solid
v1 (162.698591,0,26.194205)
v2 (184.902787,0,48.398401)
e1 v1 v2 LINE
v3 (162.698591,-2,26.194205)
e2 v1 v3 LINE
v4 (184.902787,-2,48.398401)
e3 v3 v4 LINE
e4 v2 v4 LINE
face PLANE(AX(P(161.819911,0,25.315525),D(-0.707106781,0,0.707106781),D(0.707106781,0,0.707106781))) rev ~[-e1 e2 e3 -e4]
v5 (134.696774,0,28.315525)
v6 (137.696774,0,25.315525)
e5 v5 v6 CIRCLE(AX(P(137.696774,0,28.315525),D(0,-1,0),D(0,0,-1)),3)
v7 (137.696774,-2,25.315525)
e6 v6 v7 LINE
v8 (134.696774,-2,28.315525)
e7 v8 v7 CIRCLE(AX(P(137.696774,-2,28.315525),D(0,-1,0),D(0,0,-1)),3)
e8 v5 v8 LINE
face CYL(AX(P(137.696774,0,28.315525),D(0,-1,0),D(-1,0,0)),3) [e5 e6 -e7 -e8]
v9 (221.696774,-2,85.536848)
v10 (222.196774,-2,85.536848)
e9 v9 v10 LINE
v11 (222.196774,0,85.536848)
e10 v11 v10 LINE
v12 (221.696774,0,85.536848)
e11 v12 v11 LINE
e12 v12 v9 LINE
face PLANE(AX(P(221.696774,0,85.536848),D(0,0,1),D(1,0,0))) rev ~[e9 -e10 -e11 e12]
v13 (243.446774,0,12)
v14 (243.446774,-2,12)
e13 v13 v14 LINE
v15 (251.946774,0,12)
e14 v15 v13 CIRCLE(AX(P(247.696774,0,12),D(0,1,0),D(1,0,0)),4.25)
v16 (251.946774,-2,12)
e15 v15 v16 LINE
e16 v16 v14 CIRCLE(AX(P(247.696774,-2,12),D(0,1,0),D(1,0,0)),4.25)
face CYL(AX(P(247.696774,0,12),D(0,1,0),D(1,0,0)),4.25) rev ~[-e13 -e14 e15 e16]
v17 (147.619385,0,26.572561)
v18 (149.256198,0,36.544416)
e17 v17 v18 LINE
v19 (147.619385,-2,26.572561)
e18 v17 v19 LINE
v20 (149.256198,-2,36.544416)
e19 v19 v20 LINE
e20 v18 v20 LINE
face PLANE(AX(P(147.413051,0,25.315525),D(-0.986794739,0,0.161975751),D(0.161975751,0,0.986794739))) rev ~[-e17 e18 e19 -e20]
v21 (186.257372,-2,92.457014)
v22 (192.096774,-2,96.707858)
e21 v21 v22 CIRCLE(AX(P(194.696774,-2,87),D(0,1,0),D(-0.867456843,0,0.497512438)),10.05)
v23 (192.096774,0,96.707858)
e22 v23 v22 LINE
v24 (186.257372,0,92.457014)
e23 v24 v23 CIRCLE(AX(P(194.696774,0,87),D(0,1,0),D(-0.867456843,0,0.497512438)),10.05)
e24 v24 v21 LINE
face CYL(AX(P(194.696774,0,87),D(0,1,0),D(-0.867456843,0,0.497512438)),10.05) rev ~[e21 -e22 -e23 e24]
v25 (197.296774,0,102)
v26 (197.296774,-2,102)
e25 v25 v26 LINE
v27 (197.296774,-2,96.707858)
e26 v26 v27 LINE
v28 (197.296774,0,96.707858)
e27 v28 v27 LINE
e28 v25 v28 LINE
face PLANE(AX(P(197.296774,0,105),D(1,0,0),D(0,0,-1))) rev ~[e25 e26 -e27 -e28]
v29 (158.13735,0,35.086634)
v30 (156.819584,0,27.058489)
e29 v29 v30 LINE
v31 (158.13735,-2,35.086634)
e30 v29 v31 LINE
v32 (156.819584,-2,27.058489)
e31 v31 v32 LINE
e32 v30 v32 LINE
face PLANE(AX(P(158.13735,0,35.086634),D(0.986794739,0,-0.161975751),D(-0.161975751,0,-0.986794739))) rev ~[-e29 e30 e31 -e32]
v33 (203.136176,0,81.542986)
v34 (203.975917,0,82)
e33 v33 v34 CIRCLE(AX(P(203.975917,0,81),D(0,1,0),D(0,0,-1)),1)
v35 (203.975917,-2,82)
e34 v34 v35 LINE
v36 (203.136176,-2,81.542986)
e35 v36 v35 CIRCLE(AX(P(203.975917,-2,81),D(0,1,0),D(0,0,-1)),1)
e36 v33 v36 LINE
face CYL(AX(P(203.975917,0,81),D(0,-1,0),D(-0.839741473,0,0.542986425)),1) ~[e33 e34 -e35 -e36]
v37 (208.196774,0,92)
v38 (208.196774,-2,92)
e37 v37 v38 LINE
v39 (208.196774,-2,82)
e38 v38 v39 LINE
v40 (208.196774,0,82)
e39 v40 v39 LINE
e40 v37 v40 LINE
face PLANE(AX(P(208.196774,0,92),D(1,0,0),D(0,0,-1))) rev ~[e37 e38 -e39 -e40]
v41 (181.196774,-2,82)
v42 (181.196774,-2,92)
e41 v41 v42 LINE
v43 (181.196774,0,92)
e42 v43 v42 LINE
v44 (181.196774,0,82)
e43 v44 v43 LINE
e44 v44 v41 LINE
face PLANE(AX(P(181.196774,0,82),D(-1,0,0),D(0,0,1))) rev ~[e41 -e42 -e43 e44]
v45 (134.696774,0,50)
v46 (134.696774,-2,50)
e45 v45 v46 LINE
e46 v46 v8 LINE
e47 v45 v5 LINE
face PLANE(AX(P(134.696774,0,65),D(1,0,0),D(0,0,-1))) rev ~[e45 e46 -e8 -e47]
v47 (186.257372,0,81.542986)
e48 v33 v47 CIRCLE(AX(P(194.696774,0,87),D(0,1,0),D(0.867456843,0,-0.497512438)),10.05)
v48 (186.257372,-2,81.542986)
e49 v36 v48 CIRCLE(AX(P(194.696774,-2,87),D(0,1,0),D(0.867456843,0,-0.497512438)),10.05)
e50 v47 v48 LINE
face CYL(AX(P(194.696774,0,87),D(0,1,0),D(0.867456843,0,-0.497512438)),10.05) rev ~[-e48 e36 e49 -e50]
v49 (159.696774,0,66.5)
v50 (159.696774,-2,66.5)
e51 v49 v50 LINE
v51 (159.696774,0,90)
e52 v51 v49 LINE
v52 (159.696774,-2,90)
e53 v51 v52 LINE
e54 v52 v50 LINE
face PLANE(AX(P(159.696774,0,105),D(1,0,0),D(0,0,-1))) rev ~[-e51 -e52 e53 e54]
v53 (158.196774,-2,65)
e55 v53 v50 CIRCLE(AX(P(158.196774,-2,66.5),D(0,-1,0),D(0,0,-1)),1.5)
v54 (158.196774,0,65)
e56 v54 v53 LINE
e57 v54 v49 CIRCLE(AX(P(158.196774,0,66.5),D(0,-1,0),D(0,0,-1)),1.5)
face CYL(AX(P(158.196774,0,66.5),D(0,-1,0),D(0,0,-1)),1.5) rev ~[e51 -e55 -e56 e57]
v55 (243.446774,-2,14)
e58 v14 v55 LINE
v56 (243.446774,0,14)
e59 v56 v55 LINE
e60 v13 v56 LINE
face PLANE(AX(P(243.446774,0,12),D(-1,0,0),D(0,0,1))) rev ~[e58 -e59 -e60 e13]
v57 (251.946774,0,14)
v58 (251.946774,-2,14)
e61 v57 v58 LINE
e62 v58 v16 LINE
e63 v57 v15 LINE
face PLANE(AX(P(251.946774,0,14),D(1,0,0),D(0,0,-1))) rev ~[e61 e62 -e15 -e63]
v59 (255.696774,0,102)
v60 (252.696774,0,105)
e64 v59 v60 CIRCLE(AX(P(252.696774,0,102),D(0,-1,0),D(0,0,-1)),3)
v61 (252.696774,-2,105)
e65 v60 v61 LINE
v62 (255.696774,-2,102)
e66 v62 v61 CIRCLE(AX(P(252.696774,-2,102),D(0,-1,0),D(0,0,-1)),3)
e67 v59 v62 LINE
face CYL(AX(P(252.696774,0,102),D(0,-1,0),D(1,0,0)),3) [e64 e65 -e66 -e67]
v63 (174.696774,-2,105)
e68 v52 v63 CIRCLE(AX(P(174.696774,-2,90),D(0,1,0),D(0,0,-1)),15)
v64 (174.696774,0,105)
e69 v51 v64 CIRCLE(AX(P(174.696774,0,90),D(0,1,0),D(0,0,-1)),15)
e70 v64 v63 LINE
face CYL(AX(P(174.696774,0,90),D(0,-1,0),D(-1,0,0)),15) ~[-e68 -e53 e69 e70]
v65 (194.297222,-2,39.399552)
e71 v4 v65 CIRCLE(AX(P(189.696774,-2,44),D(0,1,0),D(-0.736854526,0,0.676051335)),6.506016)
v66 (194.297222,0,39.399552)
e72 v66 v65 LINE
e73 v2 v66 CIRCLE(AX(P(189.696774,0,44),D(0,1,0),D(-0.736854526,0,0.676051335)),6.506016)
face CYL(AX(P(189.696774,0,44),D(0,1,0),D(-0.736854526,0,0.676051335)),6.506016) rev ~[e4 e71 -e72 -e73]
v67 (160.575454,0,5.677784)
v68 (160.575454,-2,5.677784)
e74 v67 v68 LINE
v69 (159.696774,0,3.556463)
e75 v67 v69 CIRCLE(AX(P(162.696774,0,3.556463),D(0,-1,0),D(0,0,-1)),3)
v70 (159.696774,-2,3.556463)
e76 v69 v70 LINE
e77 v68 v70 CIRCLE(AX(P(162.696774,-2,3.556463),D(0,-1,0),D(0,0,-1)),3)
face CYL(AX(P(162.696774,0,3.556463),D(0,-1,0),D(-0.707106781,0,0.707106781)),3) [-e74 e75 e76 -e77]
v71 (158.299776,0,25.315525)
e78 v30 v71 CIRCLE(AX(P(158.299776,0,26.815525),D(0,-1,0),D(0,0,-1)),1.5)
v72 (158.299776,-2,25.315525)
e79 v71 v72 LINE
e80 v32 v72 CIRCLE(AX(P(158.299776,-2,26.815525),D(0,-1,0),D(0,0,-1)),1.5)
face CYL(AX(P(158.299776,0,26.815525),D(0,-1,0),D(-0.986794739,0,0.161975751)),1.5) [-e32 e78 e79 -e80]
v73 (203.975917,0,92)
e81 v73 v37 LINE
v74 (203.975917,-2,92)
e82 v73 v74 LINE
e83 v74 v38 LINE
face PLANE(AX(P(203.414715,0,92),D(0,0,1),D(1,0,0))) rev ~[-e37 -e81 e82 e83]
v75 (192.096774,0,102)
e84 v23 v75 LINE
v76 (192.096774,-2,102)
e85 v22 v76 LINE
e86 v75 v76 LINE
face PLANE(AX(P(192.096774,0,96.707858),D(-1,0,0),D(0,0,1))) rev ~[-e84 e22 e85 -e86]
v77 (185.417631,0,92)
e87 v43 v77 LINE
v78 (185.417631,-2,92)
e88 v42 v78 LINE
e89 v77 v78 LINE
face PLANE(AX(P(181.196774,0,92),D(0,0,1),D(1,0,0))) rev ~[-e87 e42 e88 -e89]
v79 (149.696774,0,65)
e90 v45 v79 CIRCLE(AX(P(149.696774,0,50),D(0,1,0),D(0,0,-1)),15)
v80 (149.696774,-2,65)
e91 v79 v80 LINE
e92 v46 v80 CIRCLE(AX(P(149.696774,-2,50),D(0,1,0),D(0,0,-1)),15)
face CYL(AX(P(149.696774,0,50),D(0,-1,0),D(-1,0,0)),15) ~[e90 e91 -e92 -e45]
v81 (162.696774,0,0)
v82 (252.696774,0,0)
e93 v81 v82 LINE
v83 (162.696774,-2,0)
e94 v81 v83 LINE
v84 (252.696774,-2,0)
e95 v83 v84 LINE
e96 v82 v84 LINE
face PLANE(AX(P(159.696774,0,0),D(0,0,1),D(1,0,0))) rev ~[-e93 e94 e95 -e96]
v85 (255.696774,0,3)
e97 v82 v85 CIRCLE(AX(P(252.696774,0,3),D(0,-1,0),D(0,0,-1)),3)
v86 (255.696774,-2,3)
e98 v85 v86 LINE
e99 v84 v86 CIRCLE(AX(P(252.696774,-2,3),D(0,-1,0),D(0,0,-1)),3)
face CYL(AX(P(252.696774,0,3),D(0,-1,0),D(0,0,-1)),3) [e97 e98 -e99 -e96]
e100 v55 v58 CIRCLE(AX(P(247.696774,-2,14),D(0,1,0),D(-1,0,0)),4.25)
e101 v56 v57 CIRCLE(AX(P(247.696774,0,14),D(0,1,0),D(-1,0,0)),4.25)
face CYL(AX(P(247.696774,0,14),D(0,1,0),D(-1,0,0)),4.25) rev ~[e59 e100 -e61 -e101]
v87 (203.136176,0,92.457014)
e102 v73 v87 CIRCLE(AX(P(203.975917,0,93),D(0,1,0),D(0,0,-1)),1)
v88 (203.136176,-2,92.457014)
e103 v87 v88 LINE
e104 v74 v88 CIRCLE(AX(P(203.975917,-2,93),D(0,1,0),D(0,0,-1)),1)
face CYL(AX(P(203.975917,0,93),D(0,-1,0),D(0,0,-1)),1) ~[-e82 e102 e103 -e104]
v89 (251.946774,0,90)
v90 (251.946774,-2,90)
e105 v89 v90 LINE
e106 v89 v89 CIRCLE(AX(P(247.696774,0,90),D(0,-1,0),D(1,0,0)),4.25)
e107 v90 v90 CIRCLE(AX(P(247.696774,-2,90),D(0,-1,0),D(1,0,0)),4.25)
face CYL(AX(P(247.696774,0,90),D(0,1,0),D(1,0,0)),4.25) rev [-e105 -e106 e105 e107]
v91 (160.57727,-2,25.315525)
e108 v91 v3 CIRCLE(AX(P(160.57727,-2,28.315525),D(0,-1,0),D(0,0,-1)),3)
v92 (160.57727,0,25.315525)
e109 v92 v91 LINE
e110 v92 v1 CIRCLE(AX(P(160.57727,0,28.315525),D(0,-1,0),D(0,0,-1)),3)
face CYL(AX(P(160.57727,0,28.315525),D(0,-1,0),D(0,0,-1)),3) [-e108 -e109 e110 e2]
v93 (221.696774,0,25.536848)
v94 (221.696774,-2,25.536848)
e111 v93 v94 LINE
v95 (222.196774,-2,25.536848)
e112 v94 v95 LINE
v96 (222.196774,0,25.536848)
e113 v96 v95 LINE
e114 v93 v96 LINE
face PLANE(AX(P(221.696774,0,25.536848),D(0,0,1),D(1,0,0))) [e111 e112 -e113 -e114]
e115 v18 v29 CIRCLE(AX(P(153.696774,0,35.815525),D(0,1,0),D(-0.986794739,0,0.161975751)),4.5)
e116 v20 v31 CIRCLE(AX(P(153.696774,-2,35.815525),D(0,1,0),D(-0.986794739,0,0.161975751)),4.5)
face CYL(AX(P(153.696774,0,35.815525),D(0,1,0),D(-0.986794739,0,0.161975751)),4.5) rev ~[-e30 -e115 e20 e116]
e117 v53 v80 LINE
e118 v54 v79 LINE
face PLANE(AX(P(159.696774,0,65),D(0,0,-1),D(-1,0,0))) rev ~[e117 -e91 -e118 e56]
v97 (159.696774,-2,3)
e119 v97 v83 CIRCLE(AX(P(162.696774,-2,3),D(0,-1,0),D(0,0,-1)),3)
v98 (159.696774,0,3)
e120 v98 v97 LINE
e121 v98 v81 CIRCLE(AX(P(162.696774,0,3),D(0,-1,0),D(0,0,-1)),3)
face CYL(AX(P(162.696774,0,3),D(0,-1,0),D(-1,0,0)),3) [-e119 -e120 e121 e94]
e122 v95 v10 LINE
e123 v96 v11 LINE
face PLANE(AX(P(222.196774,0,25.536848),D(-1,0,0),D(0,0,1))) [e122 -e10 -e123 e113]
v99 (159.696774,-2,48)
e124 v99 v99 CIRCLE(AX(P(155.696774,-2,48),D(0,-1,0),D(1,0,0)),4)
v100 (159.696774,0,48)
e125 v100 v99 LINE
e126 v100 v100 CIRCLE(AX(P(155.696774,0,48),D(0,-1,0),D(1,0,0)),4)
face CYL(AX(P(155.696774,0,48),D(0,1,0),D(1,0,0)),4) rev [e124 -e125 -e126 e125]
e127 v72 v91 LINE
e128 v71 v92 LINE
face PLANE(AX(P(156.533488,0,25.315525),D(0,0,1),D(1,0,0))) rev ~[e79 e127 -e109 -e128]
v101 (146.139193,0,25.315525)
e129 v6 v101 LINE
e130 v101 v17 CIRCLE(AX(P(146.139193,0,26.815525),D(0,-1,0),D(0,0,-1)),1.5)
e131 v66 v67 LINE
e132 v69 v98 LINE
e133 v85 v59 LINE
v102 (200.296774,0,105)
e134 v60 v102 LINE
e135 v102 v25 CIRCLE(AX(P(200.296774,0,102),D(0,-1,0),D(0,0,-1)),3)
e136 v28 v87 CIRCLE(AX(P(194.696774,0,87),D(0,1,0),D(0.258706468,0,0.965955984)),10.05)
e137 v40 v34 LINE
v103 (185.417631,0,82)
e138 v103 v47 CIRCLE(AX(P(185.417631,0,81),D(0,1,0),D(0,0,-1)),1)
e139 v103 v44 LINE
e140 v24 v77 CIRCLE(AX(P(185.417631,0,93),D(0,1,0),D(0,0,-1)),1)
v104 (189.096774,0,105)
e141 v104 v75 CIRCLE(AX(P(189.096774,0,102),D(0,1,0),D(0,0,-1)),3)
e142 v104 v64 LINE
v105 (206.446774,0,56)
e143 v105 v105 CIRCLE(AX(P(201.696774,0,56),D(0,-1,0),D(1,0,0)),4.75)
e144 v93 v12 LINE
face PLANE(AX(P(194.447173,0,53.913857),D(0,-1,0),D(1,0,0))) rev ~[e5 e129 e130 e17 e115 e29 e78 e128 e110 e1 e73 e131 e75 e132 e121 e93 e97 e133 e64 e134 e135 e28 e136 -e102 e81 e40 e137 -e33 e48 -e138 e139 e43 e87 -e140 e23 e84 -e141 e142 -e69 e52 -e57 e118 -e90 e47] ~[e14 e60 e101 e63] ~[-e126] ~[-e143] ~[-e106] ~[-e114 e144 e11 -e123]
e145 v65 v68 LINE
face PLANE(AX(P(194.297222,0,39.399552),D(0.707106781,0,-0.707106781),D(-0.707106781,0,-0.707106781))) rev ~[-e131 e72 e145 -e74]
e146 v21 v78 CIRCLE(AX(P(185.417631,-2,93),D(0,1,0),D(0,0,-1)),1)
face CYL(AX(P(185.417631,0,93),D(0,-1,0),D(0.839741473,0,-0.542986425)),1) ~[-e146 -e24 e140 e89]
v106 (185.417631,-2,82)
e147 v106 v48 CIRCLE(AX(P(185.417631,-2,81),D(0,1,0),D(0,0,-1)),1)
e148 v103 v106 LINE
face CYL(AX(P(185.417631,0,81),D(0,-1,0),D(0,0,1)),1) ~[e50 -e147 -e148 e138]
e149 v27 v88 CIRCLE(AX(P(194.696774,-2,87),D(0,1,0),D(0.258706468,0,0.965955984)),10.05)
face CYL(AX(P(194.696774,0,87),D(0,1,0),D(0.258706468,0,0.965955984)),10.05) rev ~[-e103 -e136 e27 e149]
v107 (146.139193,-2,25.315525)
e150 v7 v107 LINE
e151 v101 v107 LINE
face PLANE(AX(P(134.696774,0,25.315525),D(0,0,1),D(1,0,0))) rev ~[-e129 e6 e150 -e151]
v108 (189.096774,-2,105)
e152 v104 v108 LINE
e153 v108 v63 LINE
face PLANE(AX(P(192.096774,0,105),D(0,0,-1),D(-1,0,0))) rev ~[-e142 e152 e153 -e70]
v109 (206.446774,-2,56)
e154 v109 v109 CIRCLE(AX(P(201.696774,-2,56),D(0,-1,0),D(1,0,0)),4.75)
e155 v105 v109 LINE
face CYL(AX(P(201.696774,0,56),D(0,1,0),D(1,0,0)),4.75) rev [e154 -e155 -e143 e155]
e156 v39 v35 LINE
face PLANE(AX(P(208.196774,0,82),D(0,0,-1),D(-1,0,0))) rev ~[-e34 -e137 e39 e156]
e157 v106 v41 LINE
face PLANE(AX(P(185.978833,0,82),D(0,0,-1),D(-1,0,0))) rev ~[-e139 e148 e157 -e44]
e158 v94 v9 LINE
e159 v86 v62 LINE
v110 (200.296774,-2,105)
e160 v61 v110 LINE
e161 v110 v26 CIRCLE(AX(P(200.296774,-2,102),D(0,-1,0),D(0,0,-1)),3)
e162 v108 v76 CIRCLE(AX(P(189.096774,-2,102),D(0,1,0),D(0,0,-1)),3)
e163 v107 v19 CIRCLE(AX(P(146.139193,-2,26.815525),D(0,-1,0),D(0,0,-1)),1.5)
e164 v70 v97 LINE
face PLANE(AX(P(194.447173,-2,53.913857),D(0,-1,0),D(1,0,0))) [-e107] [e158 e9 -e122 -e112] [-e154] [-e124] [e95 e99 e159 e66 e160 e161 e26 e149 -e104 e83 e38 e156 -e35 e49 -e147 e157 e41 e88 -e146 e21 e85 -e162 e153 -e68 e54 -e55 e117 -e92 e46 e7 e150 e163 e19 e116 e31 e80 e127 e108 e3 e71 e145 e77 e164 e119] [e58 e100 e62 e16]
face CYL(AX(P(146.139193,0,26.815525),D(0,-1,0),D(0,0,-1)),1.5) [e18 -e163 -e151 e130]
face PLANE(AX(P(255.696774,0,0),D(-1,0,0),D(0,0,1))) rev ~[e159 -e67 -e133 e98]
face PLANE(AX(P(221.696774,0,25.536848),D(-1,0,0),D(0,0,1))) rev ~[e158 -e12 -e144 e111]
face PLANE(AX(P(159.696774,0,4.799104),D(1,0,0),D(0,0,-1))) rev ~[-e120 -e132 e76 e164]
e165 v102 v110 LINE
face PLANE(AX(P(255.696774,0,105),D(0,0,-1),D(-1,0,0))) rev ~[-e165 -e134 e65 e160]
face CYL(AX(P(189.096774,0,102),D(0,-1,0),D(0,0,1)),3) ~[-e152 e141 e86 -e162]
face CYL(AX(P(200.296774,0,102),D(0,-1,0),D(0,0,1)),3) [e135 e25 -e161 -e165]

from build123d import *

# Parameters (mm, degrees)
F0_R     = 4
F0_R_2   = 4.75
F0_W     = 0.5
F0_H     = 60
F0_R_3   = 4.25
F1_DEPTH = 2
F2_R     = 15
F3_R     = 3
F4_R     = 1.5
F5_R     = 1


# Not quite as in the source:
# - a feature names something its author has since deleted; it is built from what else it names


with BuildPart() as f1:
    # F0 (on Front) → F1 (new body)
    with BuildSketch(Plane.XZ):
        with BuildLine():
            Line((159.6967741251, 4.7991039181), (159.6967741251, 0))
            Line((159.6967741251, 0), (255.6967741251, 0))
            Line((255.6967741251, 0), (255.6967741251, 105))
            Line((255.6967741251, 105), (197.2967741251, 105))
            Line((197.2967741251, 105), (197.2967741251, 96.7078576421))
            ThreePointArc((197.2967741251, 96.7078576421), (200.8257976645, 94.9647705839), (203.4147153958, 92))
            Line((203.4147153958, 92), (208.1967741251, 92))
            Line((208.1967741251, 92), (208.1967741251, 82))
            Line((208.1967741251, 82), (203.4147153958, 82))
            ThreePointArc((203.4147153958, 82), (194.6967741251, 76.95), (185.9788328544, 82))
            Line((185.9788328544, 82), (181.1967741251, 82))
            Line((181.1967741251, 82), (181.1967741251, 92))
            Line((181.1967741251, 92), (185.9788328544, 92))
            ThreePointArc((185.9788328544, 92), (188.5677505857, 94.9647705839), (192.0967741251, 96.7078576421))
            Line((192.0967741251, 96.7078576421), (192.0967741251, 105))
            Line((192.0967741251, 105), (159.6967741251, 105))
            Line((159.6967741251, 105), (159.6967741251, 65))
            Line((159.6967741251, 65), (134.6967741251, 65))
            Line((134.6967741251, 65), (134.6967741251, 25.3155251003))
            Line((134.6967741251, 25.3155251003), (147.4130505224, 25.3155251003))
            Line((147.4130505224, 25.3155251003), (149.2561978018, 36.5444159815))
            ThreePointArc((149.2561978018, 36.5444159815), (154.4256650063, 40.2561014236), (158.1373504484, 35.0866342191))
            Line((158.1373504484, 35.0866342191), (156.5334882879, 25.3155251003))
            Line((156.5334882879, 25.3155251003), (161.81991107, 25.3155251003))
            Line((161.81991107, 25.3155251003), (163.0631786775, 26.5587927078))
            Line((163.0631786775, 26.5587927078), (184.9027867776, 48.3984008079))
            ThreePointArc((184.9027867776, 48.3984008079), (194.1972390474, 48.6983039321), (194.2972221661, 39.399551959))
            Line((194.2972221661, 39.399551959), (159.6967741251, 4.7991039181))
        make_face()
        with Locations((155.6967741251, 48)):
            Circle(F0_R, mode=Mode.SUBTRACT)
        with BuildLine():
            ThreePointArc((251.9467741251, 12), (247.6967741251, 7.75), (243.4467741251, 12))
            Line((243.4467741251, 12), (243.4467741251, 14))
            ThreePointArc((243.4467741251, 14), (247.6967741251, 18.25), (251.9467741251, 14))
            Line((251.9467741251, 14), (251.9467741251, 12))
        make_face(mode=Mode.SUBTRACT)
        with Locations((201.6967741251, 56)):
            Circle(F0_R_2, mode=Mode.SUBTRACT)
        with Locations((221.9467741251, 55.5368482322)):
            Rectangle(F0_W, F0_H, mode=Mode.SUBTRACT)
        with Locations((247.6967741251, 90)):
            Circle(F0_R_3, mode=Mode.SUBTRACT)
    extrude(amount=F1_DEPTH)

    # F2
    f2_edges = [f1.edges().sort_by_distance(p)[0] for p in [
        (134.696774, -1, 65),
        (159.696774, -1, 105),
    ]]
    fillet(f2_edges, radius=F2_R)

    # F3
    f3_edges = [f1.edges().sort_by_distance(p)[0] for p in [
        (255.696774, -1, 105),
        (255.696774, -1, 0),
        (197.296774, -1, 105),
        (192.096774, -1, 105),
        (161.819911, -1, 25.315525),
        (159.696774, -1, 4.799104),
        (159.696774, -1, 0),
        (134.696774, -1, 25.315525),
    ]]
    fillet(f3_edges, radius=F3_R)

    # F4
    f4_edges = [f1.edges().sort_by_distance(p)[0] for p in [
        (147.413051, -1, 25.315525),
        (156.533488, -1, 25.315525),
        (159.696774, -1, 65),
    ]]
    fillet(f4_edges, radius=F4_R)

    # F5
    f5_edges = [f1.edges().sort_by_distance(p)[0] for p in [
        (185.978833, -1, 92),
        (185.978833, -1, 82),
        (203.414715, -1, 92),
        (203.414715, -1, 82),
    ]]
    fillet(f5_edges, radius=F5_R)


solid = f1.part
